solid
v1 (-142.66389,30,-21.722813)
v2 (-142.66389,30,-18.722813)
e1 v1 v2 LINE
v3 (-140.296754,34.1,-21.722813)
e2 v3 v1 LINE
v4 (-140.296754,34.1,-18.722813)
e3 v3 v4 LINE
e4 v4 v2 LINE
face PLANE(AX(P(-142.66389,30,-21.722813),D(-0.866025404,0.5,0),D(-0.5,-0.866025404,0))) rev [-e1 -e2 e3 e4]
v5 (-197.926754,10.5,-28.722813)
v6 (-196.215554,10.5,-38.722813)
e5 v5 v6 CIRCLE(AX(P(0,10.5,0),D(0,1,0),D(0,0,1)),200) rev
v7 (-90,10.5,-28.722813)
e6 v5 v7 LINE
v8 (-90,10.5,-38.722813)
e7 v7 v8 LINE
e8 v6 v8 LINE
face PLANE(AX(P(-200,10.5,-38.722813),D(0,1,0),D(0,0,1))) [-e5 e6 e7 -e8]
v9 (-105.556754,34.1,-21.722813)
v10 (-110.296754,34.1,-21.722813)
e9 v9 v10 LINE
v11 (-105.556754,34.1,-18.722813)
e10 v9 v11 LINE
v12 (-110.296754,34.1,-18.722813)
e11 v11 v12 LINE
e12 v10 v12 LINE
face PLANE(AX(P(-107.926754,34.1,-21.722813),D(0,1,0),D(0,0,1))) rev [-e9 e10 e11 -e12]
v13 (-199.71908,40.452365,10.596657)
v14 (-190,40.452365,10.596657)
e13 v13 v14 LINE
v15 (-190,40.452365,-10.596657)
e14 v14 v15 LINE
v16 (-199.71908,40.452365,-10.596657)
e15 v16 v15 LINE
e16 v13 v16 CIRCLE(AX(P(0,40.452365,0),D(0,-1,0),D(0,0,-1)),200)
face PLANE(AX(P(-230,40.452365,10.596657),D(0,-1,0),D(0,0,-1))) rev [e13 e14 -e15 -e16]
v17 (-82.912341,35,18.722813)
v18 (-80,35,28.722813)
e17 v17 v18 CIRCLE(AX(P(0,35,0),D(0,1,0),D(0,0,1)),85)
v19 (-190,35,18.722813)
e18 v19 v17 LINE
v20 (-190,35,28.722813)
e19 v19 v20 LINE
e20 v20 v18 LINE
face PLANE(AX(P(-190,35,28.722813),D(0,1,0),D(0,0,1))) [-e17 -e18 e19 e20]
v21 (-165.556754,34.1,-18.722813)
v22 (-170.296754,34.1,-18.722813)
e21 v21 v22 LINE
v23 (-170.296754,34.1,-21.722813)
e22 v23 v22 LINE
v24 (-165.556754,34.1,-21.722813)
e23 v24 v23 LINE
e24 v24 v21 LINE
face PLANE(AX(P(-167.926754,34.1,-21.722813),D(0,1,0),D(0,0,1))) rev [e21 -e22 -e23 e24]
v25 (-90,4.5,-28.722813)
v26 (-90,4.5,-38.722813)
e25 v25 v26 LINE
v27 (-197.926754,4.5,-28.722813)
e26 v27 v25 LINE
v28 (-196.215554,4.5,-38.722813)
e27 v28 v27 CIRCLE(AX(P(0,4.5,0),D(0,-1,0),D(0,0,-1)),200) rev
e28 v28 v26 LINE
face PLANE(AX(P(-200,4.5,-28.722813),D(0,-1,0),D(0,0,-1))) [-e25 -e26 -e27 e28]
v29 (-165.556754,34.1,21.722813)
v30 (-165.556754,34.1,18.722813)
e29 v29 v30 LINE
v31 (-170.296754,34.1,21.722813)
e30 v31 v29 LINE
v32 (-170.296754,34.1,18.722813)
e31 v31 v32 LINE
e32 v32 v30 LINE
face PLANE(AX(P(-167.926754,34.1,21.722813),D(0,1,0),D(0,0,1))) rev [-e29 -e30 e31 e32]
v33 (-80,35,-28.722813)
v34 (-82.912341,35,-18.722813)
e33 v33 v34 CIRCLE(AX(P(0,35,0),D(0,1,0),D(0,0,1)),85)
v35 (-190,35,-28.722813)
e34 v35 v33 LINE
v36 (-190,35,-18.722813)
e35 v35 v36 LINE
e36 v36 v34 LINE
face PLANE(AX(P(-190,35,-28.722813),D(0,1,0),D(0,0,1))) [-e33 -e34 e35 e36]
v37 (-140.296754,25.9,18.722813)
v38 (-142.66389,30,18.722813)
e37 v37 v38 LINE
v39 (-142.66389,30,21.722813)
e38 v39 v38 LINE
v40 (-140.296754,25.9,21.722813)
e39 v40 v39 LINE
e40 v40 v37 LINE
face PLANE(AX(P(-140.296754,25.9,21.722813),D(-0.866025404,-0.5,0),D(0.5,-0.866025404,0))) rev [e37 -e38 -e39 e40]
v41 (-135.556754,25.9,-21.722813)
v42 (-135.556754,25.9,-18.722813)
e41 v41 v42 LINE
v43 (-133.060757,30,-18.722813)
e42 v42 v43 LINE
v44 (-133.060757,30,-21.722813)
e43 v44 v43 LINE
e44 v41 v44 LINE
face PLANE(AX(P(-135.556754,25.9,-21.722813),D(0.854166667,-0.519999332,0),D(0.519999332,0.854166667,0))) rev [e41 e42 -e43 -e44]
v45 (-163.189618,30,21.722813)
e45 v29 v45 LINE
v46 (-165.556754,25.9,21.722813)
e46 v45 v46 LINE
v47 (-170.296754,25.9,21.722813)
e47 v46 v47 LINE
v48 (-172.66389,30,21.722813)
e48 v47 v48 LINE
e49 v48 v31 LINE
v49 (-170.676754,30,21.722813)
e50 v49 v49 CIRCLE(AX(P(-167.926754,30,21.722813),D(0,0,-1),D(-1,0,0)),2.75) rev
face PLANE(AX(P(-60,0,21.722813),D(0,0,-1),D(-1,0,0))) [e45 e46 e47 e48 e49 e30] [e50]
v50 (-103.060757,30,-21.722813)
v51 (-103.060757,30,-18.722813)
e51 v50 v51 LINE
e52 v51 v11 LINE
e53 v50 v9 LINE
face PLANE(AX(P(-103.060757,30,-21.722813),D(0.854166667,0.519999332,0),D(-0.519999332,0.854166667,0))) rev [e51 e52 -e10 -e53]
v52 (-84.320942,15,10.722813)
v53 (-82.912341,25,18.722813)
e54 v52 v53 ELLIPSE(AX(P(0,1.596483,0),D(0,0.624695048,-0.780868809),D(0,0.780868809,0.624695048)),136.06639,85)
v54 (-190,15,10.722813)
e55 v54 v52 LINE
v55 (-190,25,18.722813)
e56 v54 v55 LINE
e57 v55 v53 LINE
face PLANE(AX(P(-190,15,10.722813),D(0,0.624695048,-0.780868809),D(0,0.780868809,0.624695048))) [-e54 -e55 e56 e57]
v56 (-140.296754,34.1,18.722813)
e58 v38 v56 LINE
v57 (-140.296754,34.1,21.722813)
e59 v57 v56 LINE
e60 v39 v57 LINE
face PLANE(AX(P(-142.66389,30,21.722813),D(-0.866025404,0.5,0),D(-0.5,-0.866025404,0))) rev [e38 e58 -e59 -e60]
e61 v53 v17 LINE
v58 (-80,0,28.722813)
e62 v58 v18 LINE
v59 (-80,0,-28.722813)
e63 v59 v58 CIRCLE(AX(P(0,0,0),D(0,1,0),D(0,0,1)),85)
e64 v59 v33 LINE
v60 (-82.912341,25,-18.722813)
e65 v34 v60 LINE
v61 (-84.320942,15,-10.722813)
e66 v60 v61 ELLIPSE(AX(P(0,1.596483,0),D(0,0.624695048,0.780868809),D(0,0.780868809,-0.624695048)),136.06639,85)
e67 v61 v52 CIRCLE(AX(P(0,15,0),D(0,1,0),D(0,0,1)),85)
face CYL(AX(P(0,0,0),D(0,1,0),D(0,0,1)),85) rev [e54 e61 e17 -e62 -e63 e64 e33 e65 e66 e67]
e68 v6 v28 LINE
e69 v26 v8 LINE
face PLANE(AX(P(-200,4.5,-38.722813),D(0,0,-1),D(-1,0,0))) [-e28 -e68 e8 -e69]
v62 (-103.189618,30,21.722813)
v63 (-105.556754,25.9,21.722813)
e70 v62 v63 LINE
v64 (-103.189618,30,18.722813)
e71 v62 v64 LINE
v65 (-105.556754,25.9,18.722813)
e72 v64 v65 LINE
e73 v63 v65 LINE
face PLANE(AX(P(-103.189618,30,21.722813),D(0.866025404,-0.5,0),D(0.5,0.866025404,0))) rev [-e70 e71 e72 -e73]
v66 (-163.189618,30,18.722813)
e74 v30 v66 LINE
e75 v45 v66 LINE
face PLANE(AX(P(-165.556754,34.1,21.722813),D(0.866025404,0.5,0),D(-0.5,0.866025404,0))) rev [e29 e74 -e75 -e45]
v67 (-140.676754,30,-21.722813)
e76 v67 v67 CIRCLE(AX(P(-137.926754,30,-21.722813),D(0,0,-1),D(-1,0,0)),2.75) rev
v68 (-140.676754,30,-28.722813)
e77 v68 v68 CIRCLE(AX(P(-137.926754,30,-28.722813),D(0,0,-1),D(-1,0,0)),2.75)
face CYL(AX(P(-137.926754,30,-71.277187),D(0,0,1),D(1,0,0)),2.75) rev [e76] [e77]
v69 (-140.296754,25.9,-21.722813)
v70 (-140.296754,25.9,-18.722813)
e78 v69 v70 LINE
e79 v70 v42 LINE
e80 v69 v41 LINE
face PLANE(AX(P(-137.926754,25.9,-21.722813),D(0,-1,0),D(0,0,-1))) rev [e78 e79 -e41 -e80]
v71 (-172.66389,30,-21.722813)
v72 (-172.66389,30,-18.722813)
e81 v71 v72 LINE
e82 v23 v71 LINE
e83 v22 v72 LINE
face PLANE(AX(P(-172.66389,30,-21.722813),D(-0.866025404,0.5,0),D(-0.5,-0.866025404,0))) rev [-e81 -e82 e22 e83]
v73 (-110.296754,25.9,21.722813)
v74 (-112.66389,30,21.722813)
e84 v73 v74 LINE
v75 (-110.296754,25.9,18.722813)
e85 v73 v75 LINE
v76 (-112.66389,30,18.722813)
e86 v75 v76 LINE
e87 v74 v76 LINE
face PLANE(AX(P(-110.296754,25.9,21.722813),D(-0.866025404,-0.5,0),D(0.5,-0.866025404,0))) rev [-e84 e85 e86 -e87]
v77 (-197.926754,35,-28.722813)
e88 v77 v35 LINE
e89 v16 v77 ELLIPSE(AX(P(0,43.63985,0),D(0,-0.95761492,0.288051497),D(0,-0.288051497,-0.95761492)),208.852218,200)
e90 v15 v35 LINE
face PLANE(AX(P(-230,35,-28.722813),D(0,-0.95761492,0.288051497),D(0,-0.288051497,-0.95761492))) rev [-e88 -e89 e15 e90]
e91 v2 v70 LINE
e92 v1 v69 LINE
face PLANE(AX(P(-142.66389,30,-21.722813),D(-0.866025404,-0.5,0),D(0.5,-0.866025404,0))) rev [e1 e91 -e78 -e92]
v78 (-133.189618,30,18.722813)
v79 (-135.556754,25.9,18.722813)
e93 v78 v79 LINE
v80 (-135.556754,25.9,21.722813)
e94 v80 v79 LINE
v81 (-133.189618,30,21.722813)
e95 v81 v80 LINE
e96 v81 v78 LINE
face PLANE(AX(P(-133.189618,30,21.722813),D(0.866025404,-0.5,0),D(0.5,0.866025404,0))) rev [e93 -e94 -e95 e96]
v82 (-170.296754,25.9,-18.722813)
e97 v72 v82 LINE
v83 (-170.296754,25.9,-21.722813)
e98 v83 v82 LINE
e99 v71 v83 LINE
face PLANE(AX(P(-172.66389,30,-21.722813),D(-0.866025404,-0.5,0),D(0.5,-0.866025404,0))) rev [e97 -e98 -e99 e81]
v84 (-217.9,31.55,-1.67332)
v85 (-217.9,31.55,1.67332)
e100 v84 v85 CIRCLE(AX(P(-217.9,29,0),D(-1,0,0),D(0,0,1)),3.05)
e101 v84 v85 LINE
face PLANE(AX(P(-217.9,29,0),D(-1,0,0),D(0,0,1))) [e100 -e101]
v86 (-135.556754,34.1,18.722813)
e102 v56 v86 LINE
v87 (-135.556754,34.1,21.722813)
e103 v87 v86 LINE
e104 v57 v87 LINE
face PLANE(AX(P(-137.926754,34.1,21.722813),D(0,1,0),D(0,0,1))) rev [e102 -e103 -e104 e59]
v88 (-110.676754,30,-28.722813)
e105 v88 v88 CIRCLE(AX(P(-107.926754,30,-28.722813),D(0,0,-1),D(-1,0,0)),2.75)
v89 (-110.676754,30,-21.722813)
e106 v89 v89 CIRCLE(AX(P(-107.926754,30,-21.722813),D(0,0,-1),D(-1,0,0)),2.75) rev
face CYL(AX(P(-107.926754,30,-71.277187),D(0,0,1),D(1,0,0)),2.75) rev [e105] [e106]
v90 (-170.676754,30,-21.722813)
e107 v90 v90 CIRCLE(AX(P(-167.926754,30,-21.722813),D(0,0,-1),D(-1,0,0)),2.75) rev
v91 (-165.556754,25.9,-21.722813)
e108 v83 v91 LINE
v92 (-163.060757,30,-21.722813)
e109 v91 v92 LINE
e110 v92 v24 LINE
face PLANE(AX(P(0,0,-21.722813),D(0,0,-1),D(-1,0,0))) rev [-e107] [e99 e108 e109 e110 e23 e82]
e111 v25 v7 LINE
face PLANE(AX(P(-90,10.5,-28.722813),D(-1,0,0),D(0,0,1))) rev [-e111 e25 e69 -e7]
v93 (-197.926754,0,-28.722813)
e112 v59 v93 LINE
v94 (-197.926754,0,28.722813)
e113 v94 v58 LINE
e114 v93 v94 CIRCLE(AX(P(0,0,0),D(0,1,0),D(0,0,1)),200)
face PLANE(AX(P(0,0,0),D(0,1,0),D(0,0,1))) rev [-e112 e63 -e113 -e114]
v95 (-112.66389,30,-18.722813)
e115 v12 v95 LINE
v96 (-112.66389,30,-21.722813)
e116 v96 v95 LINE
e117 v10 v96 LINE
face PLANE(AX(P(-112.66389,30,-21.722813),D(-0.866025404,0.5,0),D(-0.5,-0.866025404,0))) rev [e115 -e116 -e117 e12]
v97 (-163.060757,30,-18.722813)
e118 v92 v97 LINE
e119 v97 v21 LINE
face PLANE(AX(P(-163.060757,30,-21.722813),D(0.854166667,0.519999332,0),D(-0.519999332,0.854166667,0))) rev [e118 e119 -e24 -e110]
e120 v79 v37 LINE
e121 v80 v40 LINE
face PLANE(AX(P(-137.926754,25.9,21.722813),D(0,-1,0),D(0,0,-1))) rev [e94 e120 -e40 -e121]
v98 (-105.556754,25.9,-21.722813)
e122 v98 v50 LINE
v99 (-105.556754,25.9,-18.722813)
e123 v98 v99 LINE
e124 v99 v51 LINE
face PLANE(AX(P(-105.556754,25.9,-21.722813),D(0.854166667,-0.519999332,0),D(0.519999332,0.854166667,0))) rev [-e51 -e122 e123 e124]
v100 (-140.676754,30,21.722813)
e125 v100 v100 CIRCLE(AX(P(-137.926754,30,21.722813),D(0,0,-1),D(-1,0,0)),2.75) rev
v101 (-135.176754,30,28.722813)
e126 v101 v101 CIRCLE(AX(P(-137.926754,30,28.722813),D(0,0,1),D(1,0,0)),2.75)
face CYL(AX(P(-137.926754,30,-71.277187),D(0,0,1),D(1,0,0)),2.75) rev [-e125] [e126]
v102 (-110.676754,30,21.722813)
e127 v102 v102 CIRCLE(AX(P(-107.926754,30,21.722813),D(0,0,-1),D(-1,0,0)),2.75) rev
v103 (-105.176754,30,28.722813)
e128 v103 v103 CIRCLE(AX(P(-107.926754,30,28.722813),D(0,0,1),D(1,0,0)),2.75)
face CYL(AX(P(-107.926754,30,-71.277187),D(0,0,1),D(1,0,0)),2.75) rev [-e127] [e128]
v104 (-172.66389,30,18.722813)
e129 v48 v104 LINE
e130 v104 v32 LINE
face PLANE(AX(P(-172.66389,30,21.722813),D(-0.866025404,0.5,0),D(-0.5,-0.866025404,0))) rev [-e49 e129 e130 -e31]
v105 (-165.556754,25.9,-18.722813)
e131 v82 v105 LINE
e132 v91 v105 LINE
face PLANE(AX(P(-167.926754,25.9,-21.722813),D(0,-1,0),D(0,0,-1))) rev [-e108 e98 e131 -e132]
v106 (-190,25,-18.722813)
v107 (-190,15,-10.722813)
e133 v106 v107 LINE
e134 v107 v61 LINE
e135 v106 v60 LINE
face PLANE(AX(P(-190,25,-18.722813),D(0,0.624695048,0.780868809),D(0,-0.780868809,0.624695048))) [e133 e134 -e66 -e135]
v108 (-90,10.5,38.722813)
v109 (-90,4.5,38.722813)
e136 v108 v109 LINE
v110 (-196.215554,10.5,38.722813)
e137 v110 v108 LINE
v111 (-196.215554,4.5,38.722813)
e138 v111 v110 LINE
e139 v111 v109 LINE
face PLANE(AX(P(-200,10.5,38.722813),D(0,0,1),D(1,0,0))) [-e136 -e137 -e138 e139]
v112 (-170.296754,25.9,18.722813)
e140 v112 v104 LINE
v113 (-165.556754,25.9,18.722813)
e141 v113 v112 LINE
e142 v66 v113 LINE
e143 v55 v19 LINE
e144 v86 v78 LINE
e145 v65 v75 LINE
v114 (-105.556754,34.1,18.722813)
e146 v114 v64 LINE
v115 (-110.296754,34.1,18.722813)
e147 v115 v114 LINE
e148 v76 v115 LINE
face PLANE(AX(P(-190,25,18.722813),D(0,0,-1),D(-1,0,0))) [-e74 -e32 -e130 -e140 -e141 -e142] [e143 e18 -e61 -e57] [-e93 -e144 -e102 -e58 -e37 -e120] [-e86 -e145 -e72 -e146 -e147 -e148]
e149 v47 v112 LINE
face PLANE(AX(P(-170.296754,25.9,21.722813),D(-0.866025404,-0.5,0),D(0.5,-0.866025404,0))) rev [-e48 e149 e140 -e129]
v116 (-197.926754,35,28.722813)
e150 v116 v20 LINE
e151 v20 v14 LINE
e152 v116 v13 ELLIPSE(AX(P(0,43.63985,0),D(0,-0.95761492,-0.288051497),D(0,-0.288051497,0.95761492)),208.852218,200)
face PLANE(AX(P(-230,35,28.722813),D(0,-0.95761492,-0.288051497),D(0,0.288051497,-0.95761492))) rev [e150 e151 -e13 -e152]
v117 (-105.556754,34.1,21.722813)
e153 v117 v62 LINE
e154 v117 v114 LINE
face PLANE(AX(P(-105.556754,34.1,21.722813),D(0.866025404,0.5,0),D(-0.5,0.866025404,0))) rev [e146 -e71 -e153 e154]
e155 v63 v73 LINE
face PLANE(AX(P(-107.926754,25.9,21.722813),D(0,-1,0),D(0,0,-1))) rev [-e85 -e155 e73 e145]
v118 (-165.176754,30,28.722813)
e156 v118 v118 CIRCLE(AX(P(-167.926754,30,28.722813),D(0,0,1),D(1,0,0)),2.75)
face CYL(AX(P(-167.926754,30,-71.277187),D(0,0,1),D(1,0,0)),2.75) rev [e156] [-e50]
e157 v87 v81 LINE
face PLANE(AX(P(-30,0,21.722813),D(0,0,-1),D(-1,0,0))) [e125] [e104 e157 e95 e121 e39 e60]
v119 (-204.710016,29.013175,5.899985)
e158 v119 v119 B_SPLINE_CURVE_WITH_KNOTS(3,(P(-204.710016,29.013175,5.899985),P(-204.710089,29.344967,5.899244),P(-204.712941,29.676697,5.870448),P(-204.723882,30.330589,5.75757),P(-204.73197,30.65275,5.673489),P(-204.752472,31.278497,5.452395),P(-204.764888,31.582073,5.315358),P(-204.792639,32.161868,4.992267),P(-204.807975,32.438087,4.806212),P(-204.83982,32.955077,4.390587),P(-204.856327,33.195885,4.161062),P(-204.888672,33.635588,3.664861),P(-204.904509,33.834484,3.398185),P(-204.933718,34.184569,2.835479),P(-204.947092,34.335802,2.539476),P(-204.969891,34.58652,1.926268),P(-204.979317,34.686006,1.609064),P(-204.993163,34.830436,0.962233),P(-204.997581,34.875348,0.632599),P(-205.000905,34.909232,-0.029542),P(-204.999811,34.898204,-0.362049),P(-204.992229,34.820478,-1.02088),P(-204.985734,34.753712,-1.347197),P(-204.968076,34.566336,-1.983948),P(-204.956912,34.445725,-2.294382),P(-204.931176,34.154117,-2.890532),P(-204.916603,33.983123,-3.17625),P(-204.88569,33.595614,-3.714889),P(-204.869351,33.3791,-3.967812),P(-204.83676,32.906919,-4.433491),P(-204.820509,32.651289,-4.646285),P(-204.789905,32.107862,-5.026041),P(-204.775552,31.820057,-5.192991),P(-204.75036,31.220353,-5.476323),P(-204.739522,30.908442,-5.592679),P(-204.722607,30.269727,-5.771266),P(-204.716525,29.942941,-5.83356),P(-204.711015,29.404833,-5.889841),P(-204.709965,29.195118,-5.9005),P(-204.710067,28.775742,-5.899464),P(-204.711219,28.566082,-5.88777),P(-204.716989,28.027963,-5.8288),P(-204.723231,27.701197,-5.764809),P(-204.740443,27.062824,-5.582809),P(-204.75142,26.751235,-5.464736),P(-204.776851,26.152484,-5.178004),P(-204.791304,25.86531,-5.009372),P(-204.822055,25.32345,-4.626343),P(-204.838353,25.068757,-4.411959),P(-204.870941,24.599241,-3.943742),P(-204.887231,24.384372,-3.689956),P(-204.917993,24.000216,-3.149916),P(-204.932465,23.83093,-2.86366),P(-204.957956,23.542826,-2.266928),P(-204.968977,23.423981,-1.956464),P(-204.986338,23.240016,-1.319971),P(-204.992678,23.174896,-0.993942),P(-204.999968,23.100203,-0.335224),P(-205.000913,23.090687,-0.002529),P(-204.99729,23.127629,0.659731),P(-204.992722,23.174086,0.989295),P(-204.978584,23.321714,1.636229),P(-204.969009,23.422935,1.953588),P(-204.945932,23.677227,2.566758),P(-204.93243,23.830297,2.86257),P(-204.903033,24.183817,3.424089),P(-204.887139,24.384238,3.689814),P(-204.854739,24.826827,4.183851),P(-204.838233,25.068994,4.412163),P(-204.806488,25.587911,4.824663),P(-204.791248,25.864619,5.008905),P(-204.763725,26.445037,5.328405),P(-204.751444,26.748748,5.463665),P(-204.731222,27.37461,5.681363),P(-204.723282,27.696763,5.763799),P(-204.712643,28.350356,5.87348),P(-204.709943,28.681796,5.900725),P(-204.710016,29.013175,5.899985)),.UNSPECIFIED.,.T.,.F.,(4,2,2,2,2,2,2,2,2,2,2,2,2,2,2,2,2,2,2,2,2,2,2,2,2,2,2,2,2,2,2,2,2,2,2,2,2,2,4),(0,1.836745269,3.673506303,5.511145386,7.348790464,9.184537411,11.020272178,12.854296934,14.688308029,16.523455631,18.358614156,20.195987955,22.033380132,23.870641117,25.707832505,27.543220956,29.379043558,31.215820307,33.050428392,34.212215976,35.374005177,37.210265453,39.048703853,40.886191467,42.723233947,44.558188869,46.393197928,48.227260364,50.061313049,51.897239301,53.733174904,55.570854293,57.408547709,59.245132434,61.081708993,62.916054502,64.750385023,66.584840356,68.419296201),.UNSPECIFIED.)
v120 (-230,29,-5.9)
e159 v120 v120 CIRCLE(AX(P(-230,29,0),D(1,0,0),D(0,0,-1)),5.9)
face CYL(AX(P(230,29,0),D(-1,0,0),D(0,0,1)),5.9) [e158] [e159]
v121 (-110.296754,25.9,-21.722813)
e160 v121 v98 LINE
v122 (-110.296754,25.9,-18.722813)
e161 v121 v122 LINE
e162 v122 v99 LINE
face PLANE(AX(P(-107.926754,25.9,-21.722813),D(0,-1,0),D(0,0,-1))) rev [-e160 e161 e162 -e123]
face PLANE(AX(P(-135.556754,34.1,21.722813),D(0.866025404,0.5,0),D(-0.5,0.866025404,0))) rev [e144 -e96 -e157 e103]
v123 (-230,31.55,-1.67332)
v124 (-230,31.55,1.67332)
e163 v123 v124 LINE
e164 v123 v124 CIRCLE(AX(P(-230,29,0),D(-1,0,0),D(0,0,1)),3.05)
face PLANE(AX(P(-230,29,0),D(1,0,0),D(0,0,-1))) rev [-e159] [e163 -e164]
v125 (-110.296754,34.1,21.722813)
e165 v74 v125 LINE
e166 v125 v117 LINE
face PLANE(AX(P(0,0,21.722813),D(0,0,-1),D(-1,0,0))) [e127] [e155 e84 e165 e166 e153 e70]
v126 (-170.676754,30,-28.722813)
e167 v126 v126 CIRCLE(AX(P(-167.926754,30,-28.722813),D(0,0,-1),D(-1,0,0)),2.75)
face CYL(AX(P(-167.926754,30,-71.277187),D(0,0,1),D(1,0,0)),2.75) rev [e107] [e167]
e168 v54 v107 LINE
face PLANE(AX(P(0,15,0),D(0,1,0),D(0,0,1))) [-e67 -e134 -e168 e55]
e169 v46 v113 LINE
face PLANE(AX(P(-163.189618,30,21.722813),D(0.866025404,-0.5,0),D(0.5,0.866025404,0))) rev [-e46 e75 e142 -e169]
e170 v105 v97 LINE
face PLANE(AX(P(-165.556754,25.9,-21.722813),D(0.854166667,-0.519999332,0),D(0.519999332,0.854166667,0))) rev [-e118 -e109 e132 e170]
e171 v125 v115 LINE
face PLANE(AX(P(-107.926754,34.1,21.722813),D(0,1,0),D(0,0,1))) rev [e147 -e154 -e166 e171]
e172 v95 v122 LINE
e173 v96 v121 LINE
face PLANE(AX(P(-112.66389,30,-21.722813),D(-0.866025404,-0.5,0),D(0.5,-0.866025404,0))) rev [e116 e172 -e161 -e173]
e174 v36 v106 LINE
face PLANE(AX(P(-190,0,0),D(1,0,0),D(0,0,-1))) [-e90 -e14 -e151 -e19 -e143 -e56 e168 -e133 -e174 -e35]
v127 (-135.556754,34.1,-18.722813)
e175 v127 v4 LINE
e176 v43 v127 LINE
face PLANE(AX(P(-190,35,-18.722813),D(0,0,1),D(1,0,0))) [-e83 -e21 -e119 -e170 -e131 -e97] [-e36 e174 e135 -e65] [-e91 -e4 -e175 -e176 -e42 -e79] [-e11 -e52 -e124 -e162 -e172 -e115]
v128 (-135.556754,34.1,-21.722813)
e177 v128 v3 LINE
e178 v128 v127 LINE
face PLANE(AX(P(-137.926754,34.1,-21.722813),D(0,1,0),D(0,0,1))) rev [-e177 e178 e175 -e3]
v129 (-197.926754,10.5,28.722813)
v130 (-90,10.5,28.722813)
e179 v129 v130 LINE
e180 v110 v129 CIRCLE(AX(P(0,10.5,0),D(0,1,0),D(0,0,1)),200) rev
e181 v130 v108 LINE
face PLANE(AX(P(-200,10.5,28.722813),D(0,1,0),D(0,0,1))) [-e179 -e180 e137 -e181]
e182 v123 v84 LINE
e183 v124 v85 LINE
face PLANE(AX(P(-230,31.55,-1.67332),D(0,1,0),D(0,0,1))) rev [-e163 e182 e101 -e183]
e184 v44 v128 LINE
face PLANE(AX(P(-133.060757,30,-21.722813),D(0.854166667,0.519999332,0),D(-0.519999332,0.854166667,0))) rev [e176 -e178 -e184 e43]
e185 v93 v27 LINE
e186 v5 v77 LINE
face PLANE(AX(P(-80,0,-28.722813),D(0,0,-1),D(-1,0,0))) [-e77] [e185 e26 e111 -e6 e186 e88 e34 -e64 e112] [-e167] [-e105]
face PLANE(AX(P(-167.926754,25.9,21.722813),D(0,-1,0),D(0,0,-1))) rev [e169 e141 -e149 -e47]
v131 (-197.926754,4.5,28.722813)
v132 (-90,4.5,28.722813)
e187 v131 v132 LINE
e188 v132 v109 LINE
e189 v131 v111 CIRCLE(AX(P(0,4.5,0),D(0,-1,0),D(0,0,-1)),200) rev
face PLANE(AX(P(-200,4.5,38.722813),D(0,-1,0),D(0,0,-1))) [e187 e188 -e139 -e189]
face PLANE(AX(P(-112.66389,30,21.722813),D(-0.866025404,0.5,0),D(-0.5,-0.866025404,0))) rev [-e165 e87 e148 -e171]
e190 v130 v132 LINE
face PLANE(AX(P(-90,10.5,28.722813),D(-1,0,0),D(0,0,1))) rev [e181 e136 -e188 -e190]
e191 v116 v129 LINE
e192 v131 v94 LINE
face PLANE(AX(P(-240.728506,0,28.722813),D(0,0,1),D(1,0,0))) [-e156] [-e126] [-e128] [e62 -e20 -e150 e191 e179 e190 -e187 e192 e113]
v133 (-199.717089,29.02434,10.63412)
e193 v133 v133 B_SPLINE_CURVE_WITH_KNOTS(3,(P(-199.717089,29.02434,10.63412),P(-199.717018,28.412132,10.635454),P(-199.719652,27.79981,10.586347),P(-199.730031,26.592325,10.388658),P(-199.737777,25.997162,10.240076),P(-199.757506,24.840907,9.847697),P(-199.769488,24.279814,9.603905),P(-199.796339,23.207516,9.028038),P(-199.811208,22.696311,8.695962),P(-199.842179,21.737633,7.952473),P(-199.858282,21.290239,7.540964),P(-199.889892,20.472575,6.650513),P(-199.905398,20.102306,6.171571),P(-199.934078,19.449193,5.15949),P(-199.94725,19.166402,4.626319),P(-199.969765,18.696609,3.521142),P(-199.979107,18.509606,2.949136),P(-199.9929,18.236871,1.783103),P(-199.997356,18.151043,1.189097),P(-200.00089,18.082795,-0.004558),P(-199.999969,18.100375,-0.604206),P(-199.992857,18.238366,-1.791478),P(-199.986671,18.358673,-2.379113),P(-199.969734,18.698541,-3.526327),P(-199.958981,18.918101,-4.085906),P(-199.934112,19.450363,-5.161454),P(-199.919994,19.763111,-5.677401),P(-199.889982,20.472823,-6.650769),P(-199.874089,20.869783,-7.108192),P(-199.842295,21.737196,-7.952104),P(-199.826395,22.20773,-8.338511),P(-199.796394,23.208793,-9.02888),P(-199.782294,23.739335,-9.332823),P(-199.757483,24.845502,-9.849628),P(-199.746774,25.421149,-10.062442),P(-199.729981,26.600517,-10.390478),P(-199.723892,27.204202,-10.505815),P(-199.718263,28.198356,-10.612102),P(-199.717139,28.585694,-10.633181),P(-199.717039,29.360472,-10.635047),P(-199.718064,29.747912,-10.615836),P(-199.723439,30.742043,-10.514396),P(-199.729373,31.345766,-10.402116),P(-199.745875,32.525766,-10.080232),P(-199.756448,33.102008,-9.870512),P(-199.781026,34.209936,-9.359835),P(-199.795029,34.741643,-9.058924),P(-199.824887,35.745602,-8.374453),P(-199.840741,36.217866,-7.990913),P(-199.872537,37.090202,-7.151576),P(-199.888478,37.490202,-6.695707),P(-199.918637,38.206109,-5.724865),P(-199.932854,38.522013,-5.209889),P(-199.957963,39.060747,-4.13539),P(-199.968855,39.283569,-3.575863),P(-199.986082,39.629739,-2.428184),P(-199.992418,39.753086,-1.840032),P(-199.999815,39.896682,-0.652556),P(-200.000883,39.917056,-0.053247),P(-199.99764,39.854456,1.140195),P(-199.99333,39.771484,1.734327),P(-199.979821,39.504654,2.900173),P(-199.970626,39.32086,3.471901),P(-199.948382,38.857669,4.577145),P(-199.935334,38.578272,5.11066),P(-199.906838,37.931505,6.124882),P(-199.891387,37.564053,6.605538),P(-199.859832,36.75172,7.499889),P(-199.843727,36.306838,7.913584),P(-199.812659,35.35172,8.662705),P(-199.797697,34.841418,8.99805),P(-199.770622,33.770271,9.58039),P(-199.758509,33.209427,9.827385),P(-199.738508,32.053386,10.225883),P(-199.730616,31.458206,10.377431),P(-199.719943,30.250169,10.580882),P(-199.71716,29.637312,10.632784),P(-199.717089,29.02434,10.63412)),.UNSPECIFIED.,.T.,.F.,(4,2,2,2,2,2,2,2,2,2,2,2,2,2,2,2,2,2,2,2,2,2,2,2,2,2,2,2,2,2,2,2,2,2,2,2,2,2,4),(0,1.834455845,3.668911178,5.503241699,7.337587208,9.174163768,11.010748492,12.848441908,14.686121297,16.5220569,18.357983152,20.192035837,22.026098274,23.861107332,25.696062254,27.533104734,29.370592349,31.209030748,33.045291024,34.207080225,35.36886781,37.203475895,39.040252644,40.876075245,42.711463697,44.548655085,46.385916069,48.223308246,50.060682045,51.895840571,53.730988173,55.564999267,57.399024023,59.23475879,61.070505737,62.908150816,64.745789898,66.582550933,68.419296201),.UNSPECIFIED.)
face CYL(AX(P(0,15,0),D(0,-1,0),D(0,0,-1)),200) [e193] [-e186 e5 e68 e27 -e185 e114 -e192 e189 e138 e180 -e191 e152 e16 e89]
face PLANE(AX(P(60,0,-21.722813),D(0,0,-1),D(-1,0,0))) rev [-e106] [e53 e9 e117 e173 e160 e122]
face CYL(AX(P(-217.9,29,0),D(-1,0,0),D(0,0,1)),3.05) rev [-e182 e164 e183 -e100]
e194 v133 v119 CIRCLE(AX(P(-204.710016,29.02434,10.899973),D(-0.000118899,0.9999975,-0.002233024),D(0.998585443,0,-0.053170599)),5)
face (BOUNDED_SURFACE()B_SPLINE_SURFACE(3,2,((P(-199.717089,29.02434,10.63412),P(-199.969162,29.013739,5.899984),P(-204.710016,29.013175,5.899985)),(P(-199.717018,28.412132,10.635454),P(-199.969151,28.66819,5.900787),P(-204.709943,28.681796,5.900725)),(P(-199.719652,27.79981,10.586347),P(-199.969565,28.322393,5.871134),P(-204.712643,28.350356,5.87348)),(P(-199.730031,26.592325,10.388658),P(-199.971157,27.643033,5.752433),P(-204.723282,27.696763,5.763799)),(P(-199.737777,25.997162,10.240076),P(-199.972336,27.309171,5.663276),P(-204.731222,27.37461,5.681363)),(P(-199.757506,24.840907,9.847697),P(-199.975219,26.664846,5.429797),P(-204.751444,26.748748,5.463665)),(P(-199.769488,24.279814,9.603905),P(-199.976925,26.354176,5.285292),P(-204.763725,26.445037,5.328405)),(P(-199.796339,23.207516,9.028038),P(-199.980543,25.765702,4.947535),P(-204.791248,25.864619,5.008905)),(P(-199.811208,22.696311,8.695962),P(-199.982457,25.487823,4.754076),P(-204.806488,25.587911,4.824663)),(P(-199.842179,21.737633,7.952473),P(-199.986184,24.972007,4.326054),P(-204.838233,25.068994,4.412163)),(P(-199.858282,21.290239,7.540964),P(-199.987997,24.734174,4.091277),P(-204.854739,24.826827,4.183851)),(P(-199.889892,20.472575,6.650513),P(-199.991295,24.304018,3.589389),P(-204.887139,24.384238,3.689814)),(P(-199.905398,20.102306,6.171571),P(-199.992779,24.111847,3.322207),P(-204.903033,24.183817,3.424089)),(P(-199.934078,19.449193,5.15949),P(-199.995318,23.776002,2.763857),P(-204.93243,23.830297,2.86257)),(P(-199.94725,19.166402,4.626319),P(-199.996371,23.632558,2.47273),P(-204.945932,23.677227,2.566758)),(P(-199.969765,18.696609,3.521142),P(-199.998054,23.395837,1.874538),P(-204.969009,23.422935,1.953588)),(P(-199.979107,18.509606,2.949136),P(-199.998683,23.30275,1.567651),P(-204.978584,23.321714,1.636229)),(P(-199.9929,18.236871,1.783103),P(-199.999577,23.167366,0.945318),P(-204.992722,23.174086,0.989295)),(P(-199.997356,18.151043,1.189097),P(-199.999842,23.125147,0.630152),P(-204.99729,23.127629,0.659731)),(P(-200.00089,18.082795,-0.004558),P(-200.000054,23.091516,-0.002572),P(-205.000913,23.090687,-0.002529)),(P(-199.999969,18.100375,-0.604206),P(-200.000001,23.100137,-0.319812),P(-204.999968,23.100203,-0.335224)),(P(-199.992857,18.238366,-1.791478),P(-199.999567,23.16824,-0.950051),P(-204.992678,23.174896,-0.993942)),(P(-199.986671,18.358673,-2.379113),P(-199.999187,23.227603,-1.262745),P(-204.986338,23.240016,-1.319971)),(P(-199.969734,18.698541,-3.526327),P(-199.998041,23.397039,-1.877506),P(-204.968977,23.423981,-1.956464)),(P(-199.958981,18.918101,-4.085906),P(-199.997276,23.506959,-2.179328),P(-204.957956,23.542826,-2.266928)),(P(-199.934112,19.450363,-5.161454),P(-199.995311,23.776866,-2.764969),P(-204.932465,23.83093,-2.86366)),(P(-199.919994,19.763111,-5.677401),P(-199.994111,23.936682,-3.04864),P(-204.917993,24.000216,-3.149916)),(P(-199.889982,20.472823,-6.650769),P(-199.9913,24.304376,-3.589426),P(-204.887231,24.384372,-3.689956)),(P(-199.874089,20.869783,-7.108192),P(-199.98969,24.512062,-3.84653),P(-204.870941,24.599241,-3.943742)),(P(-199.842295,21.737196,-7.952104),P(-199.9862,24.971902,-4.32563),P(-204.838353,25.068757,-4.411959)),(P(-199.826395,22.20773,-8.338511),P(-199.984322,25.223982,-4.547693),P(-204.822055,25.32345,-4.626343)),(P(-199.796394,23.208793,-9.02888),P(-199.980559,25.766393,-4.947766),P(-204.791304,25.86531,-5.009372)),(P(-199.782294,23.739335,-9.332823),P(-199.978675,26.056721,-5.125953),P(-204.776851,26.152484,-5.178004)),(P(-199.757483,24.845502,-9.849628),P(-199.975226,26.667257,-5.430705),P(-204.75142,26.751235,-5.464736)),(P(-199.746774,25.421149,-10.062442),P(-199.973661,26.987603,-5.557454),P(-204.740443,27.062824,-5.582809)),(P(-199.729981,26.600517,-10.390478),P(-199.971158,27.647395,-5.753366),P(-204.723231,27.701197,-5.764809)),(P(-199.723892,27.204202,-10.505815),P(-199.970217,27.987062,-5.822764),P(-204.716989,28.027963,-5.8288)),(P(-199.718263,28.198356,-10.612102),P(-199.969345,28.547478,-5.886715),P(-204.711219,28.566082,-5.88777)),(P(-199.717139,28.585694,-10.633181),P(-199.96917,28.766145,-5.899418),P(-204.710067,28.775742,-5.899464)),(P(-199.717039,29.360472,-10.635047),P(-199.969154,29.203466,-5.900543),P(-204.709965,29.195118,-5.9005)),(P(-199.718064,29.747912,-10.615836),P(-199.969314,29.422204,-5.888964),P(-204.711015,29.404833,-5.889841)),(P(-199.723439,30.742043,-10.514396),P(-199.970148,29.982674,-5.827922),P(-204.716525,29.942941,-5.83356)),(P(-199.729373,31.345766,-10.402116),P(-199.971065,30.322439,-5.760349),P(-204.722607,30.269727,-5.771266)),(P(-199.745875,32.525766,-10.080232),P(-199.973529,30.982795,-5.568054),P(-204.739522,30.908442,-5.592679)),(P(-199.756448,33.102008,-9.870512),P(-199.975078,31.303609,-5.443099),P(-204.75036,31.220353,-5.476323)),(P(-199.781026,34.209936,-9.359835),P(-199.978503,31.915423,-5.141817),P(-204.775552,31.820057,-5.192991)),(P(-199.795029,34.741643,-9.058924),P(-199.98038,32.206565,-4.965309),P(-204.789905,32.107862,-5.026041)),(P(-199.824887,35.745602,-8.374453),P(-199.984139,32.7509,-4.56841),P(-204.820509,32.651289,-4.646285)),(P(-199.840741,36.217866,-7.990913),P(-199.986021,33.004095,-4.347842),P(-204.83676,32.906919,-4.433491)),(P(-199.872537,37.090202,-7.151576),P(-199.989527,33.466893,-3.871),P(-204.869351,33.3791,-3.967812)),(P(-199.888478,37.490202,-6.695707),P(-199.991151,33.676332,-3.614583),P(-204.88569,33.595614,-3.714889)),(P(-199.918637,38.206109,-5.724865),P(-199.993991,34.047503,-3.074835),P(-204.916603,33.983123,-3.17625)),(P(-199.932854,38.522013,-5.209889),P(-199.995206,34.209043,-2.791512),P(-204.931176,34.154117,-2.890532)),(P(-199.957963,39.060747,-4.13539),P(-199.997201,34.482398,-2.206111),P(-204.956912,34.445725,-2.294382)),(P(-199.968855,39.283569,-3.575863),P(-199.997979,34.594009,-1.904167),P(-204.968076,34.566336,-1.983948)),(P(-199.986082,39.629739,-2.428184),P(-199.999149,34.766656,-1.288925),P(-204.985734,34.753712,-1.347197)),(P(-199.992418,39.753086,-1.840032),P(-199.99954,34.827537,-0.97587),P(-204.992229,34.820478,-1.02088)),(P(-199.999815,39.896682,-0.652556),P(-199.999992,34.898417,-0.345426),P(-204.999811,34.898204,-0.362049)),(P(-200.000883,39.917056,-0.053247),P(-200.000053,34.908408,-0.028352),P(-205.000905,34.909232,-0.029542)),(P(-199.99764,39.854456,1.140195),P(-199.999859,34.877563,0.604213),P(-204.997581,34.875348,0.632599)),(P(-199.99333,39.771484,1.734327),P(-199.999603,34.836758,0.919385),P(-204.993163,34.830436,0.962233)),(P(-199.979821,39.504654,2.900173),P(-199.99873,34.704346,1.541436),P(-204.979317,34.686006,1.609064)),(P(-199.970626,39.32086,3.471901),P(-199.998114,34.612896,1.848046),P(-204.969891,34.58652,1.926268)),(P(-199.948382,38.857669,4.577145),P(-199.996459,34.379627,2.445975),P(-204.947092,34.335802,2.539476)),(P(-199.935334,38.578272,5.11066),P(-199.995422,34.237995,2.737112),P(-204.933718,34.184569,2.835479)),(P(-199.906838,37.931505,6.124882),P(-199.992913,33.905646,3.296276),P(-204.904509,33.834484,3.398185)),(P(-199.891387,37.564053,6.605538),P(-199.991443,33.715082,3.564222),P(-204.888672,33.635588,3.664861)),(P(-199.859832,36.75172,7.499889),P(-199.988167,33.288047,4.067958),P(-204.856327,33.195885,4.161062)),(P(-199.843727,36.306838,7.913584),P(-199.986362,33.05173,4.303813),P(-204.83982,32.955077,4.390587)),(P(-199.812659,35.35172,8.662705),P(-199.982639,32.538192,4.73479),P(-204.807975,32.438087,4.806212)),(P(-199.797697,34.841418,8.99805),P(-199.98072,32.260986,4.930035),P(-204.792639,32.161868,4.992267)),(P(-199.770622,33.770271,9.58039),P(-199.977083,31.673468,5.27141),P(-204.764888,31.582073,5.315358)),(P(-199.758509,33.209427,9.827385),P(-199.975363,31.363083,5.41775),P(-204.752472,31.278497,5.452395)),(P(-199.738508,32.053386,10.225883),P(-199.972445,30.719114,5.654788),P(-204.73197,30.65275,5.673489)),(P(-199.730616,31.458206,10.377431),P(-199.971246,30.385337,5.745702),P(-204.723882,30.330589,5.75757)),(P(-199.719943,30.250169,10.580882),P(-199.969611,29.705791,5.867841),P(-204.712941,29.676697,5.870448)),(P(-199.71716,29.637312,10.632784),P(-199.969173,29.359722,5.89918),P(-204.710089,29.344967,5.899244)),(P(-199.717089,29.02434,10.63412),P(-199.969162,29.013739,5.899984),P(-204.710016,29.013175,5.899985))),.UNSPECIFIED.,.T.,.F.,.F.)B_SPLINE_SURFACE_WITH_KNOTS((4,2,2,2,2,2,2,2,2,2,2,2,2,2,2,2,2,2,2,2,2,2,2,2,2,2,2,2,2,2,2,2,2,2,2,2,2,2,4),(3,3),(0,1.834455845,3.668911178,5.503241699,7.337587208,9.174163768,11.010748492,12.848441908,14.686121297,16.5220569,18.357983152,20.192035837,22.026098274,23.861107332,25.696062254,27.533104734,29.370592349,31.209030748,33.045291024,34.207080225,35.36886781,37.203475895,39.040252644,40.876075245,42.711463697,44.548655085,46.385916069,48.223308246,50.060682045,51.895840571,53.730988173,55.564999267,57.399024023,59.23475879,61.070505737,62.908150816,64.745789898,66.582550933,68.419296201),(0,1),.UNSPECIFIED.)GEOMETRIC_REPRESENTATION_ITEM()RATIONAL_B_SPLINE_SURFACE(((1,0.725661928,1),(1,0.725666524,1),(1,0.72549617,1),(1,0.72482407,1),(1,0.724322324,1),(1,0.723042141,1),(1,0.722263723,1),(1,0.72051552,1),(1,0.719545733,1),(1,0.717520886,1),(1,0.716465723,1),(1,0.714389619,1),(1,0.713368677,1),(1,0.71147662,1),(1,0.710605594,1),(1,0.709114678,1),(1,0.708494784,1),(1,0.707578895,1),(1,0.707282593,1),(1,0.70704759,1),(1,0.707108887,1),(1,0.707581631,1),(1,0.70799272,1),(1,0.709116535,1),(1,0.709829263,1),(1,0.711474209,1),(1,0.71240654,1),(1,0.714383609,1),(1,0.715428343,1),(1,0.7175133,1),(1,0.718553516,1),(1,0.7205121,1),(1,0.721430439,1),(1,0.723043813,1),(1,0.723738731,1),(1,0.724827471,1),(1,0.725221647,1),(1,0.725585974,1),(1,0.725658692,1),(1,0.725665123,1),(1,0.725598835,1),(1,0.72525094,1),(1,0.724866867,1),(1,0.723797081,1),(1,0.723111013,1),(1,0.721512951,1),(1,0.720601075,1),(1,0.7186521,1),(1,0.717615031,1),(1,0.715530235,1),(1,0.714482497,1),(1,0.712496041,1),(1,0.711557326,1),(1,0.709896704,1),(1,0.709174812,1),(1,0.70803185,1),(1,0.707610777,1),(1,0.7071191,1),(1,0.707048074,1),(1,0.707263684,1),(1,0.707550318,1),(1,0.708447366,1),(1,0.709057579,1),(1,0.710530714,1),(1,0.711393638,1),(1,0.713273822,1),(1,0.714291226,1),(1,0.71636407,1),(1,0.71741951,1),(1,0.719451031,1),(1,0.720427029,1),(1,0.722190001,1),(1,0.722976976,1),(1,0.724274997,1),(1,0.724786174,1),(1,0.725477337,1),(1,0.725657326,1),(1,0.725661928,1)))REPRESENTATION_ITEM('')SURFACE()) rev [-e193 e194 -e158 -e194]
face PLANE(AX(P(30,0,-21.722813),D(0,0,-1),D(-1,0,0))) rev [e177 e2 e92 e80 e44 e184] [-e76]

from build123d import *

# Parameters (mm, degrees)
SKETCH1_R                = 200
BOSS_EXTRUDE1_DEPTH      = 15
BOSS_EXTRUDE2_DEPTH      = 200
CUT_EXTRUDE1_DEPTH       = 286.087705803
CUT_EXTRUDE1_DEPTH_BACK  = 286.087705803
SKETCH3_R                = 85
CUT_EXTRUDE2_DEPTH       = 451.079120005
CUT_EXTRUDE2_DEPTH_BACK  = 451.079120005
SKETCH4_R                = 11
CUT_EXTRUDE3_DEPTH       = 451.079120105
CUT_EXTRUDE3_DEPTH_BACK  = 110
CUT_EXTRUDE4_DEPTH       = 110
BOSS_EXTRUDE3_DEPTH      = 200
CUT_EXTRUDE5_DEPTH       = 286.087705815
CUT_EXTRUDE5_DEPTH_BACK  = 286.087705815
SKETCH7_OUTSIDE_W        = 515.59
SKETCH7_OUTSIDE_H        = 515.59
SKETCH7_OUTSIDE_R        = 200
SKETCH9_R                = 5.9
BOSS_EXTRUDE4_DEPTH      = 230
CUT_EXTRUDE6_DEPTH       = 190
CUT_EXTRUDE8_DEPTH       = 307.879455313
CUT_EXTRUDE8_DEPTH_BACK  = 307.879455313
SKETCH12_OUTSIDE_W       = 584.34
SKETCH12_OUTSIDE_H       = 524.34
SKETCH12_OUTSIDE_W_2     = 160.728506479
SKETCH12_OUTSIDE_H_2     = 57.445626466
BOSS_EXTRUDE5_DEPTH      = 190
CUT_EXTRUDE10_DEPTH      = 198.357534097
CUT_EXTRUDE10_DEPTH_BACK = 198.357534097
SKETCH20_W               = 10
SKETCH20_H               = 6
BOSS_EXTRUDE6_DEPTH      = 200
CUT_EXTRUDE9_DEPTH       = 237.718926518
CUT_EXTRUDE9_DEPTH_BACK  = 237.718926518
SKETCH15_R               = 85
CUT_EXTRUDE11_START      = 4.5
CUT_EXTRUDE11_DEPTH      = 6
CUT_EXTRUDE12_DEPTH      = 10
CUT_EXTRUDE13_DEPTH      = 10
SKETCH25_R               = 2.75
CUT_EXTRUDE14_DEPTH      = 100
SKETCH26_R               = 3.05
CUT_EXTRUDE15_DEPTH      = 12.1
FILLET1_R                = 5
CUT_EXTRUDE16_DEPTH      = 3
LPATTERN1_COUNT          = 3
LPATTERN1_PITCH          = 30
CUT_EXTRUDE17_DEPTH      = 3
LPATTERN2_COUNT          = 3
LPATTERN2_PITCH          = 30
BOSS_EXTRUDE7_START      = 12.1
BOSS_EXTRUDE7_DEPTH      = 12.1


# Read off the part's stored shape, not the designer's step: Cut-Extrude11
with BuildPart() as part:
    # Sketch1 → Boss-Extrude1 (new body)
    with BuildSketch(Plane(origin=(0, 0, 0), x_dir=(1, 0, 0), z_dir=(0, 1, 0))):
        with Locations(Location((0, 0, 0), (0, 0, 270))):
            Circle(SKETCH1_R)
    extrude(amount=BOSS_EXTRUDE1_DEPTH)

    # Sketch2 → Boss-Extrude2 (add, symmetric)
    with BuildSketch(Plane.XY):
        Polygon((-25, 50.707142143), (25, 50.707142143), (60, 15), (-60, 15), align=None)
    extrude(amount=BOSS_EXTRUDE2_DEPTH, both=True)

    # Sketch3 → Cut-Extrude1 (cut, two sides: drawn at the far end of the back side and taken through both)
    with BuildSketch(Plane(origin=(0, 15, 0), x_dir=(1, 0, 0), z_dir=(0, 1, 0)).offset(-CUT_EXTRUDE1_DEPTH_BACK)):
        with Locations(Location((0, 0, 0), (0, 0, 270))):
            Circle(SKETCH3_R)
    extrude(amount=CUT_EXTRUDE1_DEPTH + CUT_EXTRUDE1_DEPTH_BACK, mode=Mode.SUBTRACT)

    # Sketch4 → Cut-Extrude2 (cut, two sides: drawn at the far end of the back side and taken through both)
    with BuildSketch(Plane(origin=(0, 0, -200), x_dir=(-1, 0, 0), z_dir=(0, 0, -1)).offset(-CUT_EXTRUDE2_DEPTH_BACK)):
        with Locations((0, 29)):
            Circle(SKETCH4_R)
    extrude(amount=CUT_EXTRUDE2_DEPTH + CUT_EXTRUDE2_DEPTH_BACK, mode=Mode.SUBTRACT)

    # Sketch5 → Cut-Extrude3 (cut, two sides: drawn at the far end of the back side and taken through both)
    with BuildSketch(Plane.XY.offset(200).offset(-CUT_EXTRUDE3_DEPTH_BACK)):
        Polygon((-25, 50.707142143), (25, 50.707142143), (50.198039412, 25), (25, 25), (25, 15), (-25, 15), (-25, 25), (-50.198039412, 25), align=None)
    extrude(amount=CUT_EXTRUDE3_DEPTH + CUT_EXTRUDE3_DEPTH_BACK, mode=Mode.SUBTRACT)

    # Sketch6 → Cut-Extrude4 (cut)
    with BuildSketch(Plane(origin=(0, 0, -200), x_dir=(-1, 0, 0), z_dir=(0, 0, -1))):
        Polygon((-25, 50.707142143), (25, 50.707142143), (50.198039412, 25), (25, 25), (25, 15), (-25, 15), (-25, 25), (-50.198039412, 25), align=None)
    extrude(amount=-CUT_EXTRUDE4_DEPTH, mode=Mode.SUBTRACT)

    # Sketch8 → Boss-Extrude3 (add, symmetric)
    with BuildSketch(Plane(origin=(0, 0, 0), x_dir=(0, 0, -1), z_dir=(1, 0, 0))):
        Polygon((0, 15), (-30, 15), (-29.95, 44.999958333), (29.95, 44.999958333), (30, 15), align=None)
    extrude(amount=BOSS_EXTRUDE3_DEPTH, both=True)

    # Sketch7 outside → Cut-Extrude5 (cut, two sides: drawn at the far end of the back side and taken through both)
    with BuildSketch(Plane(origin=(0, 15, 0), x_dir=(1, 0, 0), z_dir=(0, 1, 0)).offset(-CUT_EXTRUDE5_DEPTH_BACK)):
        Rectangle(SKETCH7_OUTSIDE_W, SKETCH7_OUTSIDE_H)
        with Locations(Location((0, 0, 0), (0, 0, 97.180755781))):
            Circle(SKETCH7_OUTSIDE_R, mode=Mode.SUBTRACT)
    extrude(amount=CUT_EXTRUDE5_DEPTH + CUT_EXTRUDE5_DEPTH_BACK, mode=Mode.SUBTRACT)

    # Sketch9 → Boss-Extrude4 (add, symmetric)
    with BuildSketch(Plane(origin=(0, 0, 0), x_dir=(0, 0, -1), z_dir=(1, 0, 0))):
        with Locations(Location((0, 29, 0), (0, 0, 180))):
            Circle(SKETCH9_R)
    extrude(amount=BOSS_EXTRUDE4_DEPTH, both=True)

    # Sketch10 → Cut-Extrude6 (cut, symmetric)
    with BuildSketch(Plane(origin=(0, 0, 0), x_dir=(0, 0, -1), z_dir=(1, 0, 0))):
        Polygon((-30, 15), (30, 15), (29.95, 44.999958333), (-29.95, 44.999958333), align=None)
    extrude(amount=CUT_EXTRUDE6_DEPTH, both=True, mode=Mode.SUBTRACT)

    # Sketch12 outside → Cut-Extrude8 (cut, two sides: drawn at the far end of the back side and taken through both)
    with BuildSketch(Plane(origin=(0, 15, 0), x_dir=(1, 0, 0), z_dir=(0, 1, 0)).offset(-CUT_EXTRUDE8_DEPTH_BACK)):
        Rectangle(SKETCH12_OUTSIDE_W, SKETCH12_OUTSIDE_H)
        with Locations((-160.364253239, 0)):
            Rectangle(SKETCH12_OUTSIDE_W_2, SKETCH12_OUTSIDE_H_2, mode=Mode.SUBTRACT)
    extrude(amount=CUT_EXTRUDE8_DEPTH + CUT_EXTRUDE8_DEPTH_BACK, mode=Mode.SUBTRACT)

    # Sketch14 → Boss-Extrude5 (add)
    with BuildSketch(Plane(origin=(0, 0, 0), x_dir=(0, 0, -1), z_dir=(1, 0, 0))):
        Polygon((-28.722813233, 15), (-28.722813233, 35), (-18.722813233, 35), (-18.722813233, 25), (-10.722813233, 15), align=None)
        Polygon((28.722813233, 15), (28.722813233, 35), (18.722813233, 35), (18.722813233, 25), (10.722813233, 15), align=None)
    extrude(amount=-BOSS_EXTRUDE5_DEPTH)

    # Sketch16 → Cut-Extrude10 (cut, two sides: drawn at the far end of the back side and taken through both)
    with BuildSketch(Plane(origin=(-190, 0, 0), x_dir=(0, 0, -1), z_dir=(1, 0, 0)).offset(-CUT_EXTRUDE10_DEPTH_BACK)):
        Polygon((-28.722813233, 35), (-10.596657492, 40.452365235), (10.596657492, 40.452365235), (28.722813233, 35), (31.38249, 46.365203084), (-30.991256821, 46.365203084), align=None)
    extrude(amount=CUT_EXTRUDE10_DEPTH + CUT_EXTRUDE10_DEPTH_BACK, mode=Mode.SUBTRACT)

    # Sketch20 → Boss-Extrude6 (add)
    with BuildSketch(Plane(origin=(0, 0, 0), x_dir=(0, 0, -1), z_dir=(1, 0, 0))):
        with Locations((-33.722813233, 7.5)):
            Rectangle(SKETCH20_W, SKETCH20_H)
        with Locations((33.722813233, 7.5)):
            Rectangle(SKETCH20_W, SKETCH20_H)
    extrude(amount=-BOSS_EXTRUDE6_DEPTH)

    # Sketch15 → Cut-Extrude9 (cut, two sides: drawn at the far end of the back side and taken through both)
    with BuildSketch(Plane(origin=(0, 0, 0), x_dir=(1, 0, 0), z_dir=(0, 1, 0)).offset(-CUT_EXTRUDE9_DEPTH_BACK)):
        Circle(SKETCH15_R)
    extrude(amount=CUT_EXTRUDE9_DEPTH + CUT_EXTRUDE9_DEPTH_BACK, mode=Mode.SUBTRACT)

    # Cut-Extrude11 outline → Cut-Extrude11 (cut)
    with BuildSketch(Plane(origin=(0, 0, 0), x_dir=(1, 0, 0), z_dir=(0, 1, 0)).offset(CUT_EXTRUDE11_START)):
        with BuildLine():
            ThreePointArc((-196.215554265, -38.722813233), (-197.13457286, -33.733665434), (-197.926754129, -28.722813233))
            Line((-197.926754129, -28.722813233), (-200, -28.722813233))
            Line((-200, -28.722813233), (-200, -38.722813233))
            Line((-200, -38.722813233), (-196.215554265, -38.722813233))
        make_face()
        with BuildLine():
            Line((-200, 28.722813233), (-197.926754129, 28.722813233))
            ThreePointArc((-197.926754129, 28.722813233), (-197.13457286, 33.733665434), (-196.215554265, 38.722813233))
            Line((-196.215554265, 38.722813233), (-200, 38.722813233))
            Line((-200, 38.722813233), (-200, 28.722813233))
        make_face()
    extrude(amount=CUT_EXTRUDE11_DEPTH, mode=Mode.SUBTRACT)

    # Sketch23 → Cut-Extrude12 (cut)
    with BuildSketch(Plane(origin=(0, 0, -38.722813233), x_dir=(-1, 0, 0), z_dir=(0, 0, -1))):
        Polygon((75.667322771, 10.5), (80, 10.5), (90, 10.5), (90, 4.5), (75.667322771, 4.5), align=None)
    extrude(amount=-CUT_EXTRUDE12_DEPTH, mode=Mode.SUBTRACT)

    # Sketch24 → Cut-Extrude13 (cut)
    with BuildSketch(Plane.XY.offset(38.722813233)):
        Polygon((-75.667322771, 10.5), (-80, 10.5), (-90, 10.5), (-90, 4.5), (-75.667322771, 4.5), align=None)
    extrude(amount=-CUT_EXTRUDE13_DEPTH, mode=Mode.SUBTRACT)

    # Sketch25 → Cut-Extrude14 (cut)
    with BuildSketch(Plane.XY.offset(28.722813233)):
        with Locations((-167.926754129, 30)):
            Circle(SKETCH25_R)
        with Locations((-107.926754129, 30)):
            Circle(SKETCH25_R)
        with Locations((-137.926754129, 30)):
            Circle(SKETCH25_R)
    extrude(amount=-CUT_EXTRUDE14_DEPTH, mode=Mode.SUBTRACT)

    # Sketch26 → Cut-Extrude15 (cut)
    with BuildSketch(Plane.ZY.offset(230)):
        with Locations((0, 29)):
            Circle(SKETCH26_R)
    extrude(amount=-CUT_EXTRUDE15_DEPTH, mode=Mode.SUBTRACT)

    # Fillet1
    fillet1_edges = [part.edges().sort_by_distance(p)[0] for p in [
        (-199.912956058, 29, -5.9),
    ]]
    fillet(fillet1_edges, radius=FILLET1_R)

    # Sketch27 → Cut-Extrude16 (cut)
    with BuildSketch(Plane.XY.offset(-18.722813233)):
        Polygon((-167.926754129, 34.1), (-165.556754129, 34.1), (-163.060757334, 30), (-165.556754129, 25.9), (-167.926754129, 25.9), (-170.296754129, 25.9), (-172.663890233, 30), (-170.296754129, 34.1), align=None)
    cut_extrude16 = extrude(amount=-CUT_EXTRUDE16_DEPTH, mode=Mode.SUBTRACT)

    # LPattern1: Cut-Extrude16 ×3
    with Locations(*[(i * LPATTERN1_PITCH, 0, 0) for i in range(1, LPATTERN1_COUNT)]):
        add(cut_extrude16, mode=Mode.SUBTRACT)

    # Sketch28 → Cut-Extrude17 (cut)
    with BuildSketch(Plane(origin=(0, 0, 18.722813233), x_dir=(-1, 0, 0), z_dir=(0, 0, -1))):
        Polygon((107.926754129, 34.1), (110.296754129, 34.1), (112.663890233, 30), (110.296754129, 25.9), (107.926754129, 25.9), (105.556754129, 25.9), (103.189618025, 30), (105.556754129, 34.1), align=None)
    cut_extrude17 = extrude(amount=-CUT_EXTRUDE17_DEPTH, mode=Mode.SUBTRACT)

    # LPattern2: Cut-Extrude17 ×3
    with Locations(*[(-i * LPATTERN2_PITCH, 0, 0) for i in range(1, LPATTERN2_COUNT)]):
        add(cut_extrude17, mode=Mode.SUBTRACT)

    # Sketch29 → Boss-Extrude7 (add)
    with BuildSketch(Plane.ZY.offset(217.9).offset(BOSS_EXTRUDE7_START)):
        with BuildLine():
            Line((-1.673320053, 31.55), (1.673320053, 31.55))
            ThreePointArc((1.673320053, 31.55), (0, 32.05), (-1.673320053, 31.55))
        make_face()
    extrude(amount=-BOSS_EXTRUDE7_DEPTH)


solid = part.part
